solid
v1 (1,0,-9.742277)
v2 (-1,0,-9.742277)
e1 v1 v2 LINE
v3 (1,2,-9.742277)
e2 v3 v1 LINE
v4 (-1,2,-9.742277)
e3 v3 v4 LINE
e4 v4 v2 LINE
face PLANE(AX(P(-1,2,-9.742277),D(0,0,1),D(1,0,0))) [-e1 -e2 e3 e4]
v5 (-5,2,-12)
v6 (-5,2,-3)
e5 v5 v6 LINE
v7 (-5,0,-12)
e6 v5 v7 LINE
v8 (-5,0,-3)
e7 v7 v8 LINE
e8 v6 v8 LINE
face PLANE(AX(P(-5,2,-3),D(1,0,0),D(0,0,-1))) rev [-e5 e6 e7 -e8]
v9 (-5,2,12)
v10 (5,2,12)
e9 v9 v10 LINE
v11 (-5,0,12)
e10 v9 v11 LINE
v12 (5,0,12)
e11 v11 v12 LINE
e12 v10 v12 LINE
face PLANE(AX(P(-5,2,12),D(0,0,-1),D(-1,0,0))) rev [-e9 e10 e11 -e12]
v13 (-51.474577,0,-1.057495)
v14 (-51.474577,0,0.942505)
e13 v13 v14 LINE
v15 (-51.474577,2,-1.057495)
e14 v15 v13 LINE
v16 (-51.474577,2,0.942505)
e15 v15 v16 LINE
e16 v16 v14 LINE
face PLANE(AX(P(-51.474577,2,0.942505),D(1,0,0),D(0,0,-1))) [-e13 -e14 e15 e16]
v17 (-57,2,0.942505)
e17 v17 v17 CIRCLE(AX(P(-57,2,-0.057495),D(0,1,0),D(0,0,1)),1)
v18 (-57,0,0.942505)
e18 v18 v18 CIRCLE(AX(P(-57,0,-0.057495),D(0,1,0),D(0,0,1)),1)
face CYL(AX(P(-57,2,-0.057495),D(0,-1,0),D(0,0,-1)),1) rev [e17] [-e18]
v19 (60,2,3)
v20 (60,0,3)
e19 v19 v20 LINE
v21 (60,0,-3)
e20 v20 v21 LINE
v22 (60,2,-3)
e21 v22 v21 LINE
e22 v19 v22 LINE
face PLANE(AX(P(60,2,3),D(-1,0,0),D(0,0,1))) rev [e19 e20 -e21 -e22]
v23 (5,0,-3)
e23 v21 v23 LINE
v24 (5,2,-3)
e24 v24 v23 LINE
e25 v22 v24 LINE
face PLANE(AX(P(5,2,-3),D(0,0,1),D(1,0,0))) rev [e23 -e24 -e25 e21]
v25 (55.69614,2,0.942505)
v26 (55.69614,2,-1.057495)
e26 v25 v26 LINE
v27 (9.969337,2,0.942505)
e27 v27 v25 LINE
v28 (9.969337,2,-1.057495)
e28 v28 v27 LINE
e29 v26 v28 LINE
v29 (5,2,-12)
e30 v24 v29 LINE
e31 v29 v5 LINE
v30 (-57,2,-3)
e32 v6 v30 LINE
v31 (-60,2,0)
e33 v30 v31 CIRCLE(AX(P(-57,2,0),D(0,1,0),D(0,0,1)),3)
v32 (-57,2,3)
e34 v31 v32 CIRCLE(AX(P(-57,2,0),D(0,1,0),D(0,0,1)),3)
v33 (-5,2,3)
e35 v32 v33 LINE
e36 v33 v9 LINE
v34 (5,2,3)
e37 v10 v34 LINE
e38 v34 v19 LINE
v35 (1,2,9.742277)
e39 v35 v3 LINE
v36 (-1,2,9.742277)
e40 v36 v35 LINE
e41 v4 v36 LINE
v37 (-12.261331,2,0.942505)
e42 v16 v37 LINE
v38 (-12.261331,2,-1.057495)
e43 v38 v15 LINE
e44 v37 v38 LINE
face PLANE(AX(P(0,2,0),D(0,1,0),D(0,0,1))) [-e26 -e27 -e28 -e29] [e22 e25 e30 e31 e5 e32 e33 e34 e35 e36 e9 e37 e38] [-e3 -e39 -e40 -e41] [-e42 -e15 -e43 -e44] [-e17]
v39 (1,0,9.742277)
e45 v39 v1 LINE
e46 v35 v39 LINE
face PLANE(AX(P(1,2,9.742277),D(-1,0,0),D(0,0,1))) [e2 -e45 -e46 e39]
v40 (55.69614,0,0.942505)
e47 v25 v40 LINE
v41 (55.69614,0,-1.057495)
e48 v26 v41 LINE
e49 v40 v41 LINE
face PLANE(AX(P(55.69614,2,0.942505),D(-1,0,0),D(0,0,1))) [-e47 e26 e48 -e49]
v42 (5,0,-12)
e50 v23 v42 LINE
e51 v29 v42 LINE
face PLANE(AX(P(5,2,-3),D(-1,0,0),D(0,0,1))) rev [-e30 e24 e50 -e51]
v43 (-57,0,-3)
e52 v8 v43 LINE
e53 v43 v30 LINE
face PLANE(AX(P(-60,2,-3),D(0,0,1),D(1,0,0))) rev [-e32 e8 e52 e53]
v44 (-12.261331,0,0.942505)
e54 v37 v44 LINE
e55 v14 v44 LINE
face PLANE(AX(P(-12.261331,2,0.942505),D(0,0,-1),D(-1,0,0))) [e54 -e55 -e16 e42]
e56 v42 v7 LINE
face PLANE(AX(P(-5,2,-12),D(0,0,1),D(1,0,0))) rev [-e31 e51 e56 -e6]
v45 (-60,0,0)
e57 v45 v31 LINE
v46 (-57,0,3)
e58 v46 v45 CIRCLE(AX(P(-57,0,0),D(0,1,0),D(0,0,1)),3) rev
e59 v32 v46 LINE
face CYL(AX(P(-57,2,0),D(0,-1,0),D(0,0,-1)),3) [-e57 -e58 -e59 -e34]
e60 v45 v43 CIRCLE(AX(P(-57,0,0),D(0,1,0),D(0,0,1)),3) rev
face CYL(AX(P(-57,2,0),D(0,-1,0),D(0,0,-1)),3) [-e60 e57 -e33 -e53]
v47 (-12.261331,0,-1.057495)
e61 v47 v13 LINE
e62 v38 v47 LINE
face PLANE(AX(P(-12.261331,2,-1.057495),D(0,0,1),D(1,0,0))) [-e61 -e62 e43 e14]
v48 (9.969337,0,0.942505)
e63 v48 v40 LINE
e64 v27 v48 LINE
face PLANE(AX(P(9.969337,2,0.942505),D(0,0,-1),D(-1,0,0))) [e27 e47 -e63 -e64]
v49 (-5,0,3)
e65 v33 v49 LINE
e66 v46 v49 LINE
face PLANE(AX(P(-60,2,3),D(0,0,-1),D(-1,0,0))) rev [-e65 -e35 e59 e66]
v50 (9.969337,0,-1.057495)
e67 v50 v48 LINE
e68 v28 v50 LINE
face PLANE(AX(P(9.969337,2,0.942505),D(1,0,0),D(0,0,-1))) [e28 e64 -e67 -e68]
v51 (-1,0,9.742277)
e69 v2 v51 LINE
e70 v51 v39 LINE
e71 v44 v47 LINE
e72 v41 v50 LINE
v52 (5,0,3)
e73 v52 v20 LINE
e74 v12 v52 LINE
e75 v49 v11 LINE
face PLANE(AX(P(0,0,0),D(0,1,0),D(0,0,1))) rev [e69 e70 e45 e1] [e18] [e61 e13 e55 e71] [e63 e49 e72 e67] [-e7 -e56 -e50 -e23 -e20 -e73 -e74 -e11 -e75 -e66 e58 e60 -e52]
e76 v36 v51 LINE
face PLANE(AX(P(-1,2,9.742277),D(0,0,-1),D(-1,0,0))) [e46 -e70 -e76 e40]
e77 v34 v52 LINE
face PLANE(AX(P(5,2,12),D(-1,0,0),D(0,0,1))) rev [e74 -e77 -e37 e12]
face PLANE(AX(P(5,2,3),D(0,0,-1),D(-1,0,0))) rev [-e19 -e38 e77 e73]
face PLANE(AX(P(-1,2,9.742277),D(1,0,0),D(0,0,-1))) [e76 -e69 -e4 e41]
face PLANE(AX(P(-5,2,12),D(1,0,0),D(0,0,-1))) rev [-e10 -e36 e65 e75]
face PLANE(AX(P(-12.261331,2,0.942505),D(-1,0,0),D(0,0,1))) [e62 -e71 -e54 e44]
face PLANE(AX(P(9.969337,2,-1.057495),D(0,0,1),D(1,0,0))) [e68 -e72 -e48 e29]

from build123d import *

# Parameters (mm, degrees)
SKETCH1_R           = 1
SKETCH1_W           = 39.213246084
SKETCH1_H           = 2
SKETCH1_W_2         = 45.726803631
SKETCH1_W_3         = 2
SKETCH1_H_2         = 19.484553002
BOSS_EXTRUDE1_DEPTH = 2
FILLET1_R           = 3


with BuildPart() as part:
    # Sketch1 → Boss-Extrude1 (new body)
    with BuildSketch(Plane(origin=(0, 0, 0), x_dir=(1, 0, 0), z_dir=(0, 1, 0))):
        Polygon((-5, 3), (-5, 12), (5, 12), (5, 3), (60, 3), (60, -3), (5, -3), (5, -12), (-5, -12), (-5, -3), (-60, -3), (-60, 3), align=None)
        with Locations(Location((-57, 0.057494984, 0), (0, 0, 270))):
            Circle(SKETCH1_R, mode=Mode.SUBTRACT)
        with Locations((-31.867954369, 0.057494984)):
            Rectangle(SKETCH1_W, SKETCH1_H, mode=Mode.SUBTRACT)
        with Locations((32.832738322, 0.057494984)):
            Rectangle(SKETCH1_W_2, SKETCH1_H, mode=Mode.SUBTRACT)
        Rectangle(SKETCH1_W_3, SKETCH1_H_2, mode=Mode.SUBTRACT)
    extrude(amount=BOSS_EXTRUDE1_DEPTH)

    # Fillet1
    fillet1_edges = [part.edges().sort_by_distance(p)[0] for p in [
        (-60, 1, 3),
        (-60, 1, -3),
    ]]
    fillet(fillet1_edges, radius=FILLET1_R - 0.0001)  # a hair under: the kernel refuses the full size


solid = part.part
